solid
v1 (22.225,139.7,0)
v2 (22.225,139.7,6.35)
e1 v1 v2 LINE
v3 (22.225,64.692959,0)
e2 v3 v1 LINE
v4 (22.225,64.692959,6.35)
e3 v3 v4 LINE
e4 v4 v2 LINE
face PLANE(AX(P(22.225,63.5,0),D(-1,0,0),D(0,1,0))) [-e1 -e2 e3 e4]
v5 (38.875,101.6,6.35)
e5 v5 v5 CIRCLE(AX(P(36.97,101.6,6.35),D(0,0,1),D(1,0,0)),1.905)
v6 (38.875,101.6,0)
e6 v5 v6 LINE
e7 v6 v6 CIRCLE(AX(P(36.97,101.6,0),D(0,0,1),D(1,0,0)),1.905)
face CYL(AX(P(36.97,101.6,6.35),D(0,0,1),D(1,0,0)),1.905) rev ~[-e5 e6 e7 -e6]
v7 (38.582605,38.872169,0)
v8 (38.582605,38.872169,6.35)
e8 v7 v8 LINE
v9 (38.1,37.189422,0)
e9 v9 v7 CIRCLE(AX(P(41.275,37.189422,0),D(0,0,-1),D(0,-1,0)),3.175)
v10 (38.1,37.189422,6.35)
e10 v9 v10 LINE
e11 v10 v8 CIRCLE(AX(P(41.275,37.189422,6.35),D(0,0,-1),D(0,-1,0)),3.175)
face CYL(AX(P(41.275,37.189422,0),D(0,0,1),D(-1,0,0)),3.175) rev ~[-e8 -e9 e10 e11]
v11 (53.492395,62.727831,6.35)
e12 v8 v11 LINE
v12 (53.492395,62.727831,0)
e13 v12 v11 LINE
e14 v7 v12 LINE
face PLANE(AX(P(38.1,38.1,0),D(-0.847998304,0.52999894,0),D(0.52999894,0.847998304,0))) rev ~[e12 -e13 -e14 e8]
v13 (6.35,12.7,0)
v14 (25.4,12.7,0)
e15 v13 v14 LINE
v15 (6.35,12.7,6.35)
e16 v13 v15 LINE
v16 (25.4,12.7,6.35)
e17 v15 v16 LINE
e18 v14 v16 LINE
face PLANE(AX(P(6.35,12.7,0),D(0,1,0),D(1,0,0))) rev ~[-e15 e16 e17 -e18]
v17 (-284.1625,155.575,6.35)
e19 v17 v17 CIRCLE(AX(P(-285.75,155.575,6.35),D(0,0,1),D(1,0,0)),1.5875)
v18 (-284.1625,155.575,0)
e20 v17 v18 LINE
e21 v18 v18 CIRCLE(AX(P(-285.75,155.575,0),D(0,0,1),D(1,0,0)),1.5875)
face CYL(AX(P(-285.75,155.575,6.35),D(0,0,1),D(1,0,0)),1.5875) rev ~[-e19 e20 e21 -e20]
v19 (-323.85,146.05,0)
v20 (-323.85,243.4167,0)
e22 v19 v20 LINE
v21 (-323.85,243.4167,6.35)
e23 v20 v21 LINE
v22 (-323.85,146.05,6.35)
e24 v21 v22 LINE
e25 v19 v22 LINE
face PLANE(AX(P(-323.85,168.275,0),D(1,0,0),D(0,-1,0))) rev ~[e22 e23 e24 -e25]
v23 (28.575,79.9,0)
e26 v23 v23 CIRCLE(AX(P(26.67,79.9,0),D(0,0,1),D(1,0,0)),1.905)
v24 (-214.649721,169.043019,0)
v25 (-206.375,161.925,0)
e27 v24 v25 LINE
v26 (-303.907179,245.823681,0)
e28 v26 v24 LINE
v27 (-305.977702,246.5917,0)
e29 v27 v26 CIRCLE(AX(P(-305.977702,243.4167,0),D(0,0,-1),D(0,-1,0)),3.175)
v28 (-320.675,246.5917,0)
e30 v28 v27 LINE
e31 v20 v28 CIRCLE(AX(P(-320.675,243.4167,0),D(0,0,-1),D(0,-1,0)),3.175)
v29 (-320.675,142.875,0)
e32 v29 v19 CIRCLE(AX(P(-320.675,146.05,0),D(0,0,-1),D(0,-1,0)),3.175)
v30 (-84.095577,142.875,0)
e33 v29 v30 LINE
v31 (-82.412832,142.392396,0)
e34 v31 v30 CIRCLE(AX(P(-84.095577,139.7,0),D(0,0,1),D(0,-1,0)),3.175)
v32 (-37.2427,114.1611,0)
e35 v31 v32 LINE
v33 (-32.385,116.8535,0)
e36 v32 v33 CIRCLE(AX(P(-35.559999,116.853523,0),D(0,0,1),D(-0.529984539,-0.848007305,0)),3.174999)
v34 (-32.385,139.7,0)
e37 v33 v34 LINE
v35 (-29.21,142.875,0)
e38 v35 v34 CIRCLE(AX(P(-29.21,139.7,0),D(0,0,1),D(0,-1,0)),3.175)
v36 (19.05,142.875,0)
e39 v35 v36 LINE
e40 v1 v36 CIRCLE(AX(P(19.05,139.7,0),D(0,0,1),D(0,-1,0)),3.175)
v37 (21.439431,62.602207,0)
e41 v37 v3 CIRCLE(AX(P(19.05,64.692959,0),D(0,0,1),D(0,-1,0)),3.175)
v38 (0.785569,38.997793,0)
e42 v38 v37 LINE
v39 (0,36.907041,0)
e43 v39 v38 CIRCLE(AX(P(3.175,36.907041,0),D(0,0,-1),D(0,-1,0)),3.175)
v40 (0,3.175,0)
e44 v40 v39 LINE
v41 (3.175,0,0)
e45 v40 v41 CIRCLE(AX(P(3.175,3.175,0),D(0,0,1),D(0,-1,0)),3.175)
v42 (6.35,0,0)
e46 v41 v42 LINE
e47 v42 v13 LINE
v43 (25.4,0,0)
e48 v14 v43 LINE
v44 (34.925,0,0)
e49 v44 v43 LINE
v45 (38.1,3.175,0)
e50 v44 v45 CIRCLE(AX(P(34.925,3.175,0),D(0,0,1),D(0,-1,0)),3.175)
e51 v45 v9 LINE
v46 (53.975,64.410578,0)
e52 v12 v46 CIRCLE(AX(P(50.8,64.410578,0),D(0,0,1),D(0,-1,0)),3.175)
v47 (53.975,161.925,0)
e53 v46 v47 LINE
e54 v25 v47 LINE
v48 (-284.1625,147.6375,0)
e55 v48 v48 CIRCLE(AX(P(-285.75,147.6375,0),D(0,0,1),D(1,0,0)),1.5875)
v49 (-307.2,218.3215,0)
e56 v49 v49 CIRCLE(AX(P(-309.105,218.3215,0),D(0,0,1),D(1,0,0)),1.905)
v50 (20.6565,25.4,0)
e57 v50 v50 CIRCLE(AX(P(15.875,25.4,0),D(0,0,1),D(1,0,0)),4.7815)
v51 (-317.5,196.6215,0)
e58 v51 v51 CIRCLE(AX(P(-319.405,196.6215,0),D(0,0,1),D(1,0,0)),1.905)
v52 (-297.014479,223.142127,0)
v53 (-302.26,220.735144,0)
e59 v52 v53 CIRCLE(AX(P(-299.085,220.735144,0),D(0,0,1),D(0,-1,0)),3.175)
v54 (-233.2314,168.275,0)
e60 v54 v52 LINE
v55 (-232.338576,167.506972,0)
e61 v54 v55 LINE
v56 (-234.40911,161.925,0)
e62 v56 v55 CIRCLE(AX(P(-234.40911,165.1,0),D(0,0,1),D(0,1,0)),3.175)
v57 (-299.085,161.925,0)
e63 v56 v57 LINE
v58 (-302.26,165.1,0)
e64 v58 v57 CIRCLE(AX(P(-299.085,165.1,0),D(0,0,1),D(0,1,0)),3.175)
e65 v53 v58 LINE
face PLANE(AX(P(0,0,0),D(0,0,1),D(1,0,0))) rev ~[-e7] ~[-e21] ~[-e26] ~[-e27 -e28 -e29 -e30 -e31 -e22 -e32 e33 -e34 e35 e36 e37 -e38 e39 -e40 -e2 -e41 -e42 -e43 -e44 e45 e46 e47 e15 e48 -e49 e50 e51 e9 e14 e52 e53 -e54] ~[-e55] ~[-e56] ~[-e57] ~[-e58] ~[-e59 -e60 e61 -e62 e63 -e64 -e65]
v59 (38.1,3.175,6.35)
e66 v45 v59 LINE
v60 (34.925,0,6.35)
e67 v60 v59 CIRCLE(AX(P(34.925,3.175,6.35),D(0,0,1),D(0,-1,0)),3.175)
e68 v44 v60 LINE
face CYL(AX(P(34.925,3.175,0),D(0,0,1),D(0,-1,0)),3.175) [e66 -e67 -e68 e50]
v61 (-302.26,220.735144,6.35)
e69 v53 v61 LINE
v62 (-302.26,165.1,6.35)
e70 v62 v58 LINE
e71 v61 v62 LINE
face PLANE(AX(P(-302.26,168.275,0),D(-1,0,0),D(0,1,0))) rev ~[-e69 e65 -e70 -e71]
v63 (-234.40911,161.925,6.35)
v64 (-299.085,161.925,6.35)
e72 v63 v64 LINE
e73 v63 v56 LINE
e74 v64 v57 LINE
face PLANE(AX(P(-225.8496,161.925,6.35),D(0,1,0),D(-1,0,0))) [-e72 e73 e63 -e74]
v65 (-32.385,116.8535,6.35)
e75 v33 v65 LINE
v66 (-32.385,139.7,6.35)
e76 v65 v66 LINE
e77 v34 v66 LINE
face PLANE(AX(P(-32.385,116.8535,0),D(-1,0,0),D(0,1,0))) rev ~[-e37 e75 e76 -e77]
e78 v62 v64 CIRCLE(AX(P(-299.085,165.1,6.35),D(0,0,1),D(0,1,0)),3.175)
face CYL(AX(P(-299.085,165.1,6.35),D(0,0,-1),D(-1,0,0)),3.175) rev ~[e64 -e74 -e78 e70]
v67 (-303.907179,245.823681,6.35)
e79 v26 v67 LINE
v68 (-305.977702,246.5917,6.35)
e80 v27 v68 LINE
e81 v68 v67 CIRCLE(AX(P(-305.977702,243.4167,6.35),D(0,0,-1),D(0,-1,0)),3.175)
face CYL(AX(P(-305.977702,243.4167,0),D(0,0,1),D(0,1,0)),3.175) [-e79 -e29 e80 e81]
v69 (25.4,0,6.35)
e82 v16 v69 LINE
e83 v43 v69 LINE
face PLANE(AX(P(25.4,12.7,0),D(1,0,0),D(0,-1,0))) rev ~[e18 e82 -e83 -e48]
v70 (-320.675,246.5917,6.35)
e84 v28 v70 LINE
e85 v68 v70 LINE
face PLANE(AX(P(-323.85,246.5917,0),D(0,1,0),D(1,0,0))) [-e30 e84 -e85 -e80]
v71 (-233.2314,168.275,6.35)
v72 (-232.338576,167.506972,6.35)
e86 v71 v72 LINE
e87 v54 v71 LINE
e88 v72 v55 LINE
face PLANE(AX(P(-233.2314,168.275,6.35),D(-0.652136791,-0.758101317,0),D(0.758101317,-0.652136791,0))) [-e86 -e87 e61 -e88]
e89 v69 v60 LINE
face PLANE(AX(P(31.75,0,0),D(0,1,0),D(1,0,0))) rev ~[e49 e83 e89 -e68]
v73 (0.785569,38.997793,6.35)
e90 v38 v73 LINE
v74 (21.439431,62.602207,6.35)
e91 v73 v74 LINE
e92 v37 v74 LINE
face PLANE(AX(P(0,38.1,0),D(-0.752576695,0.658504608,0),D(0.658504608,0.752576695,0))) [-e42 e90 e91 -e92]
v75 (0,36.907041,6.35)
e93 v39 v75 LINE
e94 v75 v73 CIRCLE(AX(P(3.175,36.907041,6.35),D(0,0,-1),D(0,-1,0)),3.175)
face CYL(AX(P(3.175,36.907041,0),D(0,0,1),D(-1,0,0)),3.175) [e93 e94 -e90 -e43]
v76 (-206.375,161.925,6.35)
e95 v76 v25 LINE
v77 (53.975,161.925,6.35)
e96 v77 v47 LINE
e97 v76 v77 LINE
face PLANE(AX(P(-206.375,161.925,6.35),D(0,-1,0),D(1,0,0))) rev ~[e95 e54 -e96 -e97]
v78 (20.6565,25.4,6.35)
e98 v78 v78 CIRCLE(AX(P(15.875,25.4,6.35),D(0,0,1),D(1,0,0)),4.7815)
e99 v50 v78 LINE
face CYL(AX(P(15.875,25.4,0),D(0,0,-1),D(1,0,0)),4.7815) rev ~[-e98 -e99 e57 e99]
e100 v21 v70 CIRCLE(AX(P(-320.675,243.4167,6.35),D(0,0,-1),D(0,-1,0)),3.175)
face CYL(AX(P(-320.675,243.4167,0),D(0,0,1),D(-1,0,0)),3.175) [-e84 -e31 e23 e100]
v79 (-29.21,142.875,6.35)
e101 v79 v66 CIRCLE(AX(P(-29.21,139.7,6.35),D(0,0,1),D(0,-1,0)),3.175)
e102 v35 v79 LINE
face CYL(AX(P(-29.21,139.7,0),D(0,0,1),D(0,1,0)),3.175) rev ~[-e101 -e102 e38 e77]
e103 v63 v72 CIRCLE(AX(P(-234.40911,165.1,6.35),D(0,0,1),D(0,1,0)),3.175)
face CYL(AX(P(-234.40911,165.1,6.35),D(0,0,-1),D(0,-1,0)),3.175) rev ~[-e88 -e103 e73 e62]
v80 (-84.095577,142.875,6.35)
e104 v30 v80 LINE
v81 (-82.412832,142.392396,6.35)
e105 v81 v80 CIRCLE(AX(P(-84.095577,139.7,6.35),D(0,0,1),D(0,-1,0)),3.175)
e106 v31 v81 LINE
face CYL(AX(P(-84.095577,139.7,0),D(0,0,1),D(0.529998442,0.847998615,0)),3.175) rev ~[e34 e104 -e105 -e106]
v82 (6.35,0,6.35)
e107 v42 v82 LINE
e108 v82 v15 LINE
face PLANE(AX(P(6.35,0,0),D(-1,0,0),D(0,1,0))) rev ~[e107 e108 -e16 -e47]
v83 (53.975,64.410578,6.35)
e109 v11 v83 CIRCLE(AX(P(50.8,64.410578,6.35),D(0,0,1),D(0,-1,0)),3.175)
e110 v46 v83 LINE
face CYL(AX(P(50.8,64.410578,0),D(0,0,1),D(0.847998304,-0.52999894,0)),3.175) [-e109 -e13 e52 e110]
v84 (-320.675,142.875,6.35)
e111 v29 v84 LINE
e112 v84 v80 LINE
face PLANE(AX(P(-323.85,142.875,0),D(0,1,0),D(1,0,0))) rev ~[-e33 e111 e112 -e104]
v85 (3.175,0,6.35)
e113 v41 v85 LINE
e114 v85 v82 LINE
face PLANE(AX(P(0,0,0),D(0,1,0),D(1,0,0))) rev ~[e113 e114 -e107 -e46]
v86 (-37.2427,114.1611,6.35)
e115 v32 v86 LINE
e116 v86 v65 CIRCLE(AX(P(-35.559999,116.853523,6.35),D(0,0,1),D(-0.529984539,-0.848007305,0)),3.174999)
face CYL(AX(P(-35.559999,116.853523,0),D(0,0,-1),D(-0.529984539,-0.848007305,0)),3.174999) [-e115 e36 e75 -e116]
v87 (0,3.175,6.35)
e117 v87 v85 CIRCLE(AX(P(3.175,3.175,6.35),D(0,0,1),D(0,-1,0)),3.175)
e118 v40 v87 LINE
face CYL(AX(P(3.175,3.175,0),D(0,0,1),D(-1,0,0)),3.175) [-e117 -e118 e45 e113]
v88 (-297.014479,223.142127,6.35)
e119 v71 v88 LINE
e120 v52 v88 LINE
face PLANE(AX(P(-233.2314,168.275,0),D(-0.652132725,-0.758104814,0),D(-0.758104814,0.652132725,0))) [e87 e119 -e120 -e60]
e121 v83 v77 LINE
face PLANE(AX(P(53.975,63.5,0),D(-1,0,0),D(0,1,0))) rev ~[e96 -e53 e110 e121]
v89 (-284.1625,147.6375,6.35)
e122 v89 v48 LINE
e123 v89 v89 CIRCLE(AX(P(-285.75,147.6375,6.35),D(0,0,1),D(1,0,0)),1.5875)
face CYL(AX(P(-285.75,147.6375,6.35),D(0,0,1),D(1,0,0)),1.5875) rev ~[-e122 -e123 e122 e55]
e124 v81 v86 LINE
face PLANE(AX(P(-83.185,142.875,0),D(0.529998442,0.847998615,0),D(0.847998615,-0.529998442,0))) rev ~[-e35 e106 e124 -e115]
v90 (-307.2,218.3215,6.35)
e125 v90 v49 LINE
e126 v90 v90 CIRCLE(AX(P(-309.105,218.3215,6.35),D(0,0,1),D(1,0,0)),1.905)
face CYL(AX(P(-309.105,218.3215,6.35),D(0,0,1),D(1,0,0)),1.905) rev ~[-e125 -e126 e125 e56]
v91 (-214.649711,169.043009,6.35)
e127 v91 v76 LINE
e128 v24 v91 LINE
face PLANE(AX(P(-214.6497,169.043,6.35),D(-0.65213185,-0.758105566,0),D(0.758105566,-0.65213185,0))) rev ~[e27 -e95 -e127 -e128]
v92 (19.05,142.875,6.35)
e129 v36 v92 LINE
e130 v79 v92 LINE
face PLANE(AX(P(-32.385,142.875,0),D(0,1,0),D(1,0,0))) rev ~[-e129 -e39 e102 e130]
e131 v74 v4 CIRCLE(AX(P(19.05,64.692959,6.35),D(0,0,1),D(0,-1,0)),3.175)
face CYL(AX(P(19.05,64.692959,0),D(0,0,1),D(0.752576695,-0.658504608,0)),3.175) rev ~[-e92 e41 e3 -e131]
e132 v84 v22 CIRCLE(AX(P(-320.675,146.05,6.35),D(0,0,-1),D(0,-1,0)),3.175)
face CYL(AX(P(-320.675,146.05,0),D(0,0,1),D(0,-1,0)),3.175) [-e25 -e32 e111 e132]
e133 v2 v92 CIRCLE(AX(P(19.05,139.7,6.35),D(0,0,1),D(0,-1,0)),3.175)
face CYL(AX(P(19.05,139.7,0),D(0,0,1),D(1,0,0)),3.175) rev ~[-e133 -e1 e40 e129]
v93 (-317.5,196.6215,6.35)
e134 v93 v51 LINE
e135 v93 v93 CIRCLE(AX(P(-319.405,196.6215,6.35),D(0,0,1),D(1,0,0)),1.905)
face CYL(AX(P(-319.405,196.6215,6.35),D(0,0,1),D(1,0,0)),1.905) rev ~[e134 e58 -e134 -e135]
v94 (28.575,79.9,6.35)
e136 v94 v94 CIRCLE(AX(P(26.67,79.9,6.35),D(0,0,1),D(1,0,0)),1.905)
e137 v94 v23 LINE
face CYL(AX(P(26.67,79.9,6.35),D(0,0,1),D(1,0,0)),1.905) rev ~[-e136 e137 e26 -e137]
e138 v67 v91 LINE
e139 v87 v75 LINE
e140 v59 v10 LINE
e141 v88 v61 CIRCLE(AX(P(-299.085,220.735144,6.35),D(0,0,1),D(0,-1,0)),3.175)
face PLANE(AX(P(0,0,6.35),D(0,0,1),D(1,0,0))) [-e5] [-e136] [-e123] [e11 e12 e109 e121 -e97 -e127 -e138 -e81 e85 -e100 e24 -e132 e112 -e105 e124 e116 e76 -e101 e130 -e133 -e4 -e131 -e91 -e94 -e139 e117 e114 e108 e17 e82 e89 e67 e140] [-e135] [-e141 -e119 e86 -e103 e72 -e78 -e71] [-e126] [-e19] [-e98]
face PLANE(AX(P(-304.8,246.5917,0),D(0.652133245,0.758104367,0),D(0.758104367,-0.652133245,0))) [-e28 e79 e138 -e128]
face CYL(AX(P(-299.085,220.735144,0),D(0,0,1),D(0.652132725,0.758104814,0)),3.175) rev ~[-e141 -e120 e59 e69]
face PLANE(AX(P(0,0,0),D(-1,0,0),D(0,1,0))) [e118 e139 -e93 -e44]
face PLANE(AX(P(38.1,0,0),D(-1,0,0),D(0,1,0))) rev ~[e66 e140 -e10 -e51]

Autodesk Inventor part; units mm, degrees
ref_plane "YZ Plane" through (0, 0, 0) normal (1, 0, 0) x (0, 1, 0)
sketch "Sketch1" plane through (0, 0, 0) normal (0, 0, 1) x (1, 0, 0)
  line L0 (0, 0) -> (6.35, 0)
  line L1 (6.35, 0) -> (6.35, 12.7)
  line L2 (6.35, 12.7) -> (25.4, 12.7)
  line L3 (25.4, 12.7) -> (25.4, 0)
  line L4 (25.4, 0) -> (31.75, 0)
  circle A0 centre (15.875, 25.4) radius 4.7815
  line L5 (-323.85, 246.5917) -> (-305.435, 246.5917)
  line L6 (-323.85, 142.875) -> (-83.185, 142.875)
  line L7 (-83.185, 142.875) -> (-37.2427, 114.1611)
  line L8 (-32.385, 142.875) -> (22.225, 142.875)
  line L9 (-32.385, 116.8535) -> (-32.385, 142.875)
  arc A1 (-37.2427, 114.1611) -> (-32.385, 116.8535) centre (-35.56, 116.8535) ccw
  line L10 (-323.85, 168.275) -> (-323.85, 246.5917)
  line L11 (-323.85, 246.5917) -> (-304.8, 246.5917)
  line L12 (-323.85, 168.275) -> (-323.85, 142.875)
  line L13 (0, 0) -> (0, 38.1)
  line L14 (53.975, -21.4734) -> (53.975, 330.2514) construction
  line L15 (0, 38.1) -> (22.225, 63.5)
  line L16 (22.225, 63.5) -> (22.225, 142.875)
  line L17 (53.975, 63.5) -> (53.975, 168.275)
  line L18 (53.975, 63.5) -> (53.975, 168.275)
  line L19 (22.225, 63.5) -> (22.225, 142.875)
  line L20 (-32.385, 142.875) -> (22.225, 142.875)
  line L21 (-83.185, 142.875) -> (-323.85, 142.875)
  line L22 (31.75, 0) -> (38.1, 0)
  line L23 (38.1, 0) -> (38.1, 38.1)
  line L24 (38.1, 38.1) -> (53.975, 63.5)
  line L25 (38.1, 0) -> (31.75, 0)
  line L26 (-304.8, 246.5917) -> (-213.7569, 168.275)
  line L27 (-233.2314, 168.275) -> (-302.26, 227.6544)
  line L28 (53.975, 168.275) -> (-213.7569, 168.275)
  line L29 (-233.2314, 168.275) -> (-302.26, 168.275)
  line L30 (-302.26, 168.275) -> (-233.2314, 168.275)
  line L31 (-213.7569, 168.275) -> (53.975, 168.275)
  circle A2 centre (-285.75, 149.225) radius 1.5875
  circle A3 centre (-285.75, 161.925) radius 1.5875
  line L32 (-302.26, 168.275) -> (-302.26, 227.6544)
  point P0 (-32.385, 111.125)
  point P1 (-359.41, 168.275)
  dimension "d0" = 6.35
  dimension "d1" = 12.7
  dimension "d2" = 19.05
  dimension "d3" = 6.35
  dimension "d4" = 12.7
  dimension "d5" = 9.5631
  dimension "d6" = 12.7
  dimension "d8" = 377.825
  dimension "d17" = 103.7167
  dimension "d19" = 9.525
  dimension "d25" = 31.75
  dimension "d26" = 3.175
  dimension "d27" = 50.8
  dimension "d30" = 19.05
  dimension "d63" = 38.1
  dimension "d68" = 0
  dimension "d69" = 54.61
  dimension "d71" = 22.225
  dimension "d72" = 0
  dimension "d74" = 79.375
  dimension "d76" = 240.665
  dimension "d87" = 6.35
  dimension "d88" = 38.1
  dimension "d89" = 25.4
  dimension "d91" = 25.4
  dimension "d94" = 12.7
  dimension "d97" = 40.703
  dimension "d98" = 267.7319
  dimension "d109" = 3.175
  dimension "d110" = 3.175
  dimension "d111" = 38.1
  dimension "d112" = 38.1
  dimension "d113" = 6.35
  dimension "d114" = 6.35
  dimension "d135" = 25.4
  dimension "d136" = 25.4
  dimension "d143" = 21.59
ref_plane "Work Plane4" through (0, 0, 9.525) normal (0, 0, 1) x (1, 0, 0)
ref_plane "Work Plane3" through (0, 0, 9.525) normal (0, 0, 1) x (1, 0, 0)
extrude "Extrusion9" add sketch "Sketch1" along normal blind 6.35 contours L13 L15 L16 L8 L9 A1 L7 L6 L12 L10 L5 L11 L26 L28 L17 L24 L23 L22 L4 L3 L2 L1 L0 | A2 | A3
sketch "Sketch8" plane through (0, 0, 6.35) normal (0, 0, 1) x (1, 0, 0)
  line L0 (-304.8, 246.5917) -> (-323.85, 246.5917) projected
  line L1 (-323.85, 246.5917) -> (-323.85, 142.875) projected
  circle A0 centre (-309.105, 218.3215) radius 1.905
  circle A1 centre (-319.405, 196.6215) radius 1.905
  line L2 (-32.385, 142.875) -> (22.225, 142.875) projected
  line L3 (22.225, 142.875) -> (22.225, 63.5) projected
  circle A2 centre (36.97, 101.6) radius 1.905
  circle A3 centre (26.67, 79.9) radius 1.905
  dimension "d101" = 3.81
  dimension "d102" = 3.81
  dimension "d104" = 28.2702
  dimension "d105" = 4.445
  dimension "d147" = 21.7
  dimension "d148" = 10.3
  dimension "d149" = 3.81
  dimension "d150" = 3.81
  dimension "d151" = 21.7
  dimension "d152" = 10.3
  dimension "d153" = 41.275
  dimension "d154" = 4.445
extrude "Extrusion10" cut sketch "Sketch8" against normal blind 6.35
sketch "Sketch9" plane through (0, 0, 6.35) normal (0, 0, 1) x (1, 0, 0)
  line L0 (-323.85, 246.5917) -> (-323.85, 142.875) projected
  line L1 (-323.85, 142.875) -> (-83.185, 142.875) projected
  circle A0 centre (-285.75, 155.575) radius 1.5875
  circle A1 centre (-285.75, 147.6375) radius 1.5875
  dimension "d115" = 3.175
  dimension "d116" = 3.175
  dimension "d117" = 38.1
  dimension "d118" = 38.1
  dimension "d119" = 4.7625
  dimension "d124" = 7.9375
extrude "Extrusion11" cut sketch "Sketch9" against normal blind 6.35
fillet "Fillet8" radius 3.175 14 edges at (-304.8, 246.5917, 3.175) (-323.85, 246.5917, 3.175) (-213.7569, 168.275, 3.175) (53.975, 168.275, 3.175) (53.975, 63.5, 3.175) (38.1, 38.1, 3.175) (0, 0, 3.175) (0, 38.1, 3.175) (22.225, 142.875, 3.175) (22.225, 63.5, 3.175) (-83.185, 142.875, 3.175) (-32.385, 142.875, 3.175) (-323.85, 142.875, 3.175) (-302.26, 227.6544, 3.175)
fillet "Fillet9" radius 3.175 1 edges at (38.1, 0, 3.175)
sketch "Sketch11" plane through (0, 0, 6.35) normal (0, 0, 1) x (1, 0, 0)
  line L0 (53.975, 64.4106) -> (53.975, 165.1) projected
  arc A0 (53.975, 165.1) -> (50.8, 168.275) centre (50.8, 165.1) ccw projected
  line L1 (50.8, 168.275) -> (-212.5792, 168.275) projected
  arc A1 (-214.6497, 169.043) -> (-212.5792, 168.275) centre (-212.5792, 171.45) ccw projected
  line L2 (-233.2314, 168.275) -> (-302.26, 168.275) projected
  line L3 (-297.0145, 223.1421) -> (-233.2314, 168.275) projected
  line L4 (-302.26, 161.925) -> (-233.2314, 161.925)
  line L5 (-233.2314, 168.275) -> (-225.8496, 161.925)
  line L6 (-225.8496, 161.925) -> (-233.2314, 161.925)
  line L7 (-214.6497, 169.043) -> (-206.375, 161.925)
  line L8 (-206.375, 161.925) -> (53.975, 161.925)
  line L9 (-302.26, 168.275) -> (-302.26, 161.925)
  point P0 (0, 0)
  dimension "d139" = 6.35
  dimension "d144" = 6.35
extrude "Extrusion13" cut sketch "Sketch11" against normal blind 25.4
fillet "Fillet11" radius 3.175 2 edges at (-302.26, 161.925, 3.175) (-225.8496, 161.925, 3.175)
properties part number "Rebuild Left Climber Hook" material "Aluminum 6061"
